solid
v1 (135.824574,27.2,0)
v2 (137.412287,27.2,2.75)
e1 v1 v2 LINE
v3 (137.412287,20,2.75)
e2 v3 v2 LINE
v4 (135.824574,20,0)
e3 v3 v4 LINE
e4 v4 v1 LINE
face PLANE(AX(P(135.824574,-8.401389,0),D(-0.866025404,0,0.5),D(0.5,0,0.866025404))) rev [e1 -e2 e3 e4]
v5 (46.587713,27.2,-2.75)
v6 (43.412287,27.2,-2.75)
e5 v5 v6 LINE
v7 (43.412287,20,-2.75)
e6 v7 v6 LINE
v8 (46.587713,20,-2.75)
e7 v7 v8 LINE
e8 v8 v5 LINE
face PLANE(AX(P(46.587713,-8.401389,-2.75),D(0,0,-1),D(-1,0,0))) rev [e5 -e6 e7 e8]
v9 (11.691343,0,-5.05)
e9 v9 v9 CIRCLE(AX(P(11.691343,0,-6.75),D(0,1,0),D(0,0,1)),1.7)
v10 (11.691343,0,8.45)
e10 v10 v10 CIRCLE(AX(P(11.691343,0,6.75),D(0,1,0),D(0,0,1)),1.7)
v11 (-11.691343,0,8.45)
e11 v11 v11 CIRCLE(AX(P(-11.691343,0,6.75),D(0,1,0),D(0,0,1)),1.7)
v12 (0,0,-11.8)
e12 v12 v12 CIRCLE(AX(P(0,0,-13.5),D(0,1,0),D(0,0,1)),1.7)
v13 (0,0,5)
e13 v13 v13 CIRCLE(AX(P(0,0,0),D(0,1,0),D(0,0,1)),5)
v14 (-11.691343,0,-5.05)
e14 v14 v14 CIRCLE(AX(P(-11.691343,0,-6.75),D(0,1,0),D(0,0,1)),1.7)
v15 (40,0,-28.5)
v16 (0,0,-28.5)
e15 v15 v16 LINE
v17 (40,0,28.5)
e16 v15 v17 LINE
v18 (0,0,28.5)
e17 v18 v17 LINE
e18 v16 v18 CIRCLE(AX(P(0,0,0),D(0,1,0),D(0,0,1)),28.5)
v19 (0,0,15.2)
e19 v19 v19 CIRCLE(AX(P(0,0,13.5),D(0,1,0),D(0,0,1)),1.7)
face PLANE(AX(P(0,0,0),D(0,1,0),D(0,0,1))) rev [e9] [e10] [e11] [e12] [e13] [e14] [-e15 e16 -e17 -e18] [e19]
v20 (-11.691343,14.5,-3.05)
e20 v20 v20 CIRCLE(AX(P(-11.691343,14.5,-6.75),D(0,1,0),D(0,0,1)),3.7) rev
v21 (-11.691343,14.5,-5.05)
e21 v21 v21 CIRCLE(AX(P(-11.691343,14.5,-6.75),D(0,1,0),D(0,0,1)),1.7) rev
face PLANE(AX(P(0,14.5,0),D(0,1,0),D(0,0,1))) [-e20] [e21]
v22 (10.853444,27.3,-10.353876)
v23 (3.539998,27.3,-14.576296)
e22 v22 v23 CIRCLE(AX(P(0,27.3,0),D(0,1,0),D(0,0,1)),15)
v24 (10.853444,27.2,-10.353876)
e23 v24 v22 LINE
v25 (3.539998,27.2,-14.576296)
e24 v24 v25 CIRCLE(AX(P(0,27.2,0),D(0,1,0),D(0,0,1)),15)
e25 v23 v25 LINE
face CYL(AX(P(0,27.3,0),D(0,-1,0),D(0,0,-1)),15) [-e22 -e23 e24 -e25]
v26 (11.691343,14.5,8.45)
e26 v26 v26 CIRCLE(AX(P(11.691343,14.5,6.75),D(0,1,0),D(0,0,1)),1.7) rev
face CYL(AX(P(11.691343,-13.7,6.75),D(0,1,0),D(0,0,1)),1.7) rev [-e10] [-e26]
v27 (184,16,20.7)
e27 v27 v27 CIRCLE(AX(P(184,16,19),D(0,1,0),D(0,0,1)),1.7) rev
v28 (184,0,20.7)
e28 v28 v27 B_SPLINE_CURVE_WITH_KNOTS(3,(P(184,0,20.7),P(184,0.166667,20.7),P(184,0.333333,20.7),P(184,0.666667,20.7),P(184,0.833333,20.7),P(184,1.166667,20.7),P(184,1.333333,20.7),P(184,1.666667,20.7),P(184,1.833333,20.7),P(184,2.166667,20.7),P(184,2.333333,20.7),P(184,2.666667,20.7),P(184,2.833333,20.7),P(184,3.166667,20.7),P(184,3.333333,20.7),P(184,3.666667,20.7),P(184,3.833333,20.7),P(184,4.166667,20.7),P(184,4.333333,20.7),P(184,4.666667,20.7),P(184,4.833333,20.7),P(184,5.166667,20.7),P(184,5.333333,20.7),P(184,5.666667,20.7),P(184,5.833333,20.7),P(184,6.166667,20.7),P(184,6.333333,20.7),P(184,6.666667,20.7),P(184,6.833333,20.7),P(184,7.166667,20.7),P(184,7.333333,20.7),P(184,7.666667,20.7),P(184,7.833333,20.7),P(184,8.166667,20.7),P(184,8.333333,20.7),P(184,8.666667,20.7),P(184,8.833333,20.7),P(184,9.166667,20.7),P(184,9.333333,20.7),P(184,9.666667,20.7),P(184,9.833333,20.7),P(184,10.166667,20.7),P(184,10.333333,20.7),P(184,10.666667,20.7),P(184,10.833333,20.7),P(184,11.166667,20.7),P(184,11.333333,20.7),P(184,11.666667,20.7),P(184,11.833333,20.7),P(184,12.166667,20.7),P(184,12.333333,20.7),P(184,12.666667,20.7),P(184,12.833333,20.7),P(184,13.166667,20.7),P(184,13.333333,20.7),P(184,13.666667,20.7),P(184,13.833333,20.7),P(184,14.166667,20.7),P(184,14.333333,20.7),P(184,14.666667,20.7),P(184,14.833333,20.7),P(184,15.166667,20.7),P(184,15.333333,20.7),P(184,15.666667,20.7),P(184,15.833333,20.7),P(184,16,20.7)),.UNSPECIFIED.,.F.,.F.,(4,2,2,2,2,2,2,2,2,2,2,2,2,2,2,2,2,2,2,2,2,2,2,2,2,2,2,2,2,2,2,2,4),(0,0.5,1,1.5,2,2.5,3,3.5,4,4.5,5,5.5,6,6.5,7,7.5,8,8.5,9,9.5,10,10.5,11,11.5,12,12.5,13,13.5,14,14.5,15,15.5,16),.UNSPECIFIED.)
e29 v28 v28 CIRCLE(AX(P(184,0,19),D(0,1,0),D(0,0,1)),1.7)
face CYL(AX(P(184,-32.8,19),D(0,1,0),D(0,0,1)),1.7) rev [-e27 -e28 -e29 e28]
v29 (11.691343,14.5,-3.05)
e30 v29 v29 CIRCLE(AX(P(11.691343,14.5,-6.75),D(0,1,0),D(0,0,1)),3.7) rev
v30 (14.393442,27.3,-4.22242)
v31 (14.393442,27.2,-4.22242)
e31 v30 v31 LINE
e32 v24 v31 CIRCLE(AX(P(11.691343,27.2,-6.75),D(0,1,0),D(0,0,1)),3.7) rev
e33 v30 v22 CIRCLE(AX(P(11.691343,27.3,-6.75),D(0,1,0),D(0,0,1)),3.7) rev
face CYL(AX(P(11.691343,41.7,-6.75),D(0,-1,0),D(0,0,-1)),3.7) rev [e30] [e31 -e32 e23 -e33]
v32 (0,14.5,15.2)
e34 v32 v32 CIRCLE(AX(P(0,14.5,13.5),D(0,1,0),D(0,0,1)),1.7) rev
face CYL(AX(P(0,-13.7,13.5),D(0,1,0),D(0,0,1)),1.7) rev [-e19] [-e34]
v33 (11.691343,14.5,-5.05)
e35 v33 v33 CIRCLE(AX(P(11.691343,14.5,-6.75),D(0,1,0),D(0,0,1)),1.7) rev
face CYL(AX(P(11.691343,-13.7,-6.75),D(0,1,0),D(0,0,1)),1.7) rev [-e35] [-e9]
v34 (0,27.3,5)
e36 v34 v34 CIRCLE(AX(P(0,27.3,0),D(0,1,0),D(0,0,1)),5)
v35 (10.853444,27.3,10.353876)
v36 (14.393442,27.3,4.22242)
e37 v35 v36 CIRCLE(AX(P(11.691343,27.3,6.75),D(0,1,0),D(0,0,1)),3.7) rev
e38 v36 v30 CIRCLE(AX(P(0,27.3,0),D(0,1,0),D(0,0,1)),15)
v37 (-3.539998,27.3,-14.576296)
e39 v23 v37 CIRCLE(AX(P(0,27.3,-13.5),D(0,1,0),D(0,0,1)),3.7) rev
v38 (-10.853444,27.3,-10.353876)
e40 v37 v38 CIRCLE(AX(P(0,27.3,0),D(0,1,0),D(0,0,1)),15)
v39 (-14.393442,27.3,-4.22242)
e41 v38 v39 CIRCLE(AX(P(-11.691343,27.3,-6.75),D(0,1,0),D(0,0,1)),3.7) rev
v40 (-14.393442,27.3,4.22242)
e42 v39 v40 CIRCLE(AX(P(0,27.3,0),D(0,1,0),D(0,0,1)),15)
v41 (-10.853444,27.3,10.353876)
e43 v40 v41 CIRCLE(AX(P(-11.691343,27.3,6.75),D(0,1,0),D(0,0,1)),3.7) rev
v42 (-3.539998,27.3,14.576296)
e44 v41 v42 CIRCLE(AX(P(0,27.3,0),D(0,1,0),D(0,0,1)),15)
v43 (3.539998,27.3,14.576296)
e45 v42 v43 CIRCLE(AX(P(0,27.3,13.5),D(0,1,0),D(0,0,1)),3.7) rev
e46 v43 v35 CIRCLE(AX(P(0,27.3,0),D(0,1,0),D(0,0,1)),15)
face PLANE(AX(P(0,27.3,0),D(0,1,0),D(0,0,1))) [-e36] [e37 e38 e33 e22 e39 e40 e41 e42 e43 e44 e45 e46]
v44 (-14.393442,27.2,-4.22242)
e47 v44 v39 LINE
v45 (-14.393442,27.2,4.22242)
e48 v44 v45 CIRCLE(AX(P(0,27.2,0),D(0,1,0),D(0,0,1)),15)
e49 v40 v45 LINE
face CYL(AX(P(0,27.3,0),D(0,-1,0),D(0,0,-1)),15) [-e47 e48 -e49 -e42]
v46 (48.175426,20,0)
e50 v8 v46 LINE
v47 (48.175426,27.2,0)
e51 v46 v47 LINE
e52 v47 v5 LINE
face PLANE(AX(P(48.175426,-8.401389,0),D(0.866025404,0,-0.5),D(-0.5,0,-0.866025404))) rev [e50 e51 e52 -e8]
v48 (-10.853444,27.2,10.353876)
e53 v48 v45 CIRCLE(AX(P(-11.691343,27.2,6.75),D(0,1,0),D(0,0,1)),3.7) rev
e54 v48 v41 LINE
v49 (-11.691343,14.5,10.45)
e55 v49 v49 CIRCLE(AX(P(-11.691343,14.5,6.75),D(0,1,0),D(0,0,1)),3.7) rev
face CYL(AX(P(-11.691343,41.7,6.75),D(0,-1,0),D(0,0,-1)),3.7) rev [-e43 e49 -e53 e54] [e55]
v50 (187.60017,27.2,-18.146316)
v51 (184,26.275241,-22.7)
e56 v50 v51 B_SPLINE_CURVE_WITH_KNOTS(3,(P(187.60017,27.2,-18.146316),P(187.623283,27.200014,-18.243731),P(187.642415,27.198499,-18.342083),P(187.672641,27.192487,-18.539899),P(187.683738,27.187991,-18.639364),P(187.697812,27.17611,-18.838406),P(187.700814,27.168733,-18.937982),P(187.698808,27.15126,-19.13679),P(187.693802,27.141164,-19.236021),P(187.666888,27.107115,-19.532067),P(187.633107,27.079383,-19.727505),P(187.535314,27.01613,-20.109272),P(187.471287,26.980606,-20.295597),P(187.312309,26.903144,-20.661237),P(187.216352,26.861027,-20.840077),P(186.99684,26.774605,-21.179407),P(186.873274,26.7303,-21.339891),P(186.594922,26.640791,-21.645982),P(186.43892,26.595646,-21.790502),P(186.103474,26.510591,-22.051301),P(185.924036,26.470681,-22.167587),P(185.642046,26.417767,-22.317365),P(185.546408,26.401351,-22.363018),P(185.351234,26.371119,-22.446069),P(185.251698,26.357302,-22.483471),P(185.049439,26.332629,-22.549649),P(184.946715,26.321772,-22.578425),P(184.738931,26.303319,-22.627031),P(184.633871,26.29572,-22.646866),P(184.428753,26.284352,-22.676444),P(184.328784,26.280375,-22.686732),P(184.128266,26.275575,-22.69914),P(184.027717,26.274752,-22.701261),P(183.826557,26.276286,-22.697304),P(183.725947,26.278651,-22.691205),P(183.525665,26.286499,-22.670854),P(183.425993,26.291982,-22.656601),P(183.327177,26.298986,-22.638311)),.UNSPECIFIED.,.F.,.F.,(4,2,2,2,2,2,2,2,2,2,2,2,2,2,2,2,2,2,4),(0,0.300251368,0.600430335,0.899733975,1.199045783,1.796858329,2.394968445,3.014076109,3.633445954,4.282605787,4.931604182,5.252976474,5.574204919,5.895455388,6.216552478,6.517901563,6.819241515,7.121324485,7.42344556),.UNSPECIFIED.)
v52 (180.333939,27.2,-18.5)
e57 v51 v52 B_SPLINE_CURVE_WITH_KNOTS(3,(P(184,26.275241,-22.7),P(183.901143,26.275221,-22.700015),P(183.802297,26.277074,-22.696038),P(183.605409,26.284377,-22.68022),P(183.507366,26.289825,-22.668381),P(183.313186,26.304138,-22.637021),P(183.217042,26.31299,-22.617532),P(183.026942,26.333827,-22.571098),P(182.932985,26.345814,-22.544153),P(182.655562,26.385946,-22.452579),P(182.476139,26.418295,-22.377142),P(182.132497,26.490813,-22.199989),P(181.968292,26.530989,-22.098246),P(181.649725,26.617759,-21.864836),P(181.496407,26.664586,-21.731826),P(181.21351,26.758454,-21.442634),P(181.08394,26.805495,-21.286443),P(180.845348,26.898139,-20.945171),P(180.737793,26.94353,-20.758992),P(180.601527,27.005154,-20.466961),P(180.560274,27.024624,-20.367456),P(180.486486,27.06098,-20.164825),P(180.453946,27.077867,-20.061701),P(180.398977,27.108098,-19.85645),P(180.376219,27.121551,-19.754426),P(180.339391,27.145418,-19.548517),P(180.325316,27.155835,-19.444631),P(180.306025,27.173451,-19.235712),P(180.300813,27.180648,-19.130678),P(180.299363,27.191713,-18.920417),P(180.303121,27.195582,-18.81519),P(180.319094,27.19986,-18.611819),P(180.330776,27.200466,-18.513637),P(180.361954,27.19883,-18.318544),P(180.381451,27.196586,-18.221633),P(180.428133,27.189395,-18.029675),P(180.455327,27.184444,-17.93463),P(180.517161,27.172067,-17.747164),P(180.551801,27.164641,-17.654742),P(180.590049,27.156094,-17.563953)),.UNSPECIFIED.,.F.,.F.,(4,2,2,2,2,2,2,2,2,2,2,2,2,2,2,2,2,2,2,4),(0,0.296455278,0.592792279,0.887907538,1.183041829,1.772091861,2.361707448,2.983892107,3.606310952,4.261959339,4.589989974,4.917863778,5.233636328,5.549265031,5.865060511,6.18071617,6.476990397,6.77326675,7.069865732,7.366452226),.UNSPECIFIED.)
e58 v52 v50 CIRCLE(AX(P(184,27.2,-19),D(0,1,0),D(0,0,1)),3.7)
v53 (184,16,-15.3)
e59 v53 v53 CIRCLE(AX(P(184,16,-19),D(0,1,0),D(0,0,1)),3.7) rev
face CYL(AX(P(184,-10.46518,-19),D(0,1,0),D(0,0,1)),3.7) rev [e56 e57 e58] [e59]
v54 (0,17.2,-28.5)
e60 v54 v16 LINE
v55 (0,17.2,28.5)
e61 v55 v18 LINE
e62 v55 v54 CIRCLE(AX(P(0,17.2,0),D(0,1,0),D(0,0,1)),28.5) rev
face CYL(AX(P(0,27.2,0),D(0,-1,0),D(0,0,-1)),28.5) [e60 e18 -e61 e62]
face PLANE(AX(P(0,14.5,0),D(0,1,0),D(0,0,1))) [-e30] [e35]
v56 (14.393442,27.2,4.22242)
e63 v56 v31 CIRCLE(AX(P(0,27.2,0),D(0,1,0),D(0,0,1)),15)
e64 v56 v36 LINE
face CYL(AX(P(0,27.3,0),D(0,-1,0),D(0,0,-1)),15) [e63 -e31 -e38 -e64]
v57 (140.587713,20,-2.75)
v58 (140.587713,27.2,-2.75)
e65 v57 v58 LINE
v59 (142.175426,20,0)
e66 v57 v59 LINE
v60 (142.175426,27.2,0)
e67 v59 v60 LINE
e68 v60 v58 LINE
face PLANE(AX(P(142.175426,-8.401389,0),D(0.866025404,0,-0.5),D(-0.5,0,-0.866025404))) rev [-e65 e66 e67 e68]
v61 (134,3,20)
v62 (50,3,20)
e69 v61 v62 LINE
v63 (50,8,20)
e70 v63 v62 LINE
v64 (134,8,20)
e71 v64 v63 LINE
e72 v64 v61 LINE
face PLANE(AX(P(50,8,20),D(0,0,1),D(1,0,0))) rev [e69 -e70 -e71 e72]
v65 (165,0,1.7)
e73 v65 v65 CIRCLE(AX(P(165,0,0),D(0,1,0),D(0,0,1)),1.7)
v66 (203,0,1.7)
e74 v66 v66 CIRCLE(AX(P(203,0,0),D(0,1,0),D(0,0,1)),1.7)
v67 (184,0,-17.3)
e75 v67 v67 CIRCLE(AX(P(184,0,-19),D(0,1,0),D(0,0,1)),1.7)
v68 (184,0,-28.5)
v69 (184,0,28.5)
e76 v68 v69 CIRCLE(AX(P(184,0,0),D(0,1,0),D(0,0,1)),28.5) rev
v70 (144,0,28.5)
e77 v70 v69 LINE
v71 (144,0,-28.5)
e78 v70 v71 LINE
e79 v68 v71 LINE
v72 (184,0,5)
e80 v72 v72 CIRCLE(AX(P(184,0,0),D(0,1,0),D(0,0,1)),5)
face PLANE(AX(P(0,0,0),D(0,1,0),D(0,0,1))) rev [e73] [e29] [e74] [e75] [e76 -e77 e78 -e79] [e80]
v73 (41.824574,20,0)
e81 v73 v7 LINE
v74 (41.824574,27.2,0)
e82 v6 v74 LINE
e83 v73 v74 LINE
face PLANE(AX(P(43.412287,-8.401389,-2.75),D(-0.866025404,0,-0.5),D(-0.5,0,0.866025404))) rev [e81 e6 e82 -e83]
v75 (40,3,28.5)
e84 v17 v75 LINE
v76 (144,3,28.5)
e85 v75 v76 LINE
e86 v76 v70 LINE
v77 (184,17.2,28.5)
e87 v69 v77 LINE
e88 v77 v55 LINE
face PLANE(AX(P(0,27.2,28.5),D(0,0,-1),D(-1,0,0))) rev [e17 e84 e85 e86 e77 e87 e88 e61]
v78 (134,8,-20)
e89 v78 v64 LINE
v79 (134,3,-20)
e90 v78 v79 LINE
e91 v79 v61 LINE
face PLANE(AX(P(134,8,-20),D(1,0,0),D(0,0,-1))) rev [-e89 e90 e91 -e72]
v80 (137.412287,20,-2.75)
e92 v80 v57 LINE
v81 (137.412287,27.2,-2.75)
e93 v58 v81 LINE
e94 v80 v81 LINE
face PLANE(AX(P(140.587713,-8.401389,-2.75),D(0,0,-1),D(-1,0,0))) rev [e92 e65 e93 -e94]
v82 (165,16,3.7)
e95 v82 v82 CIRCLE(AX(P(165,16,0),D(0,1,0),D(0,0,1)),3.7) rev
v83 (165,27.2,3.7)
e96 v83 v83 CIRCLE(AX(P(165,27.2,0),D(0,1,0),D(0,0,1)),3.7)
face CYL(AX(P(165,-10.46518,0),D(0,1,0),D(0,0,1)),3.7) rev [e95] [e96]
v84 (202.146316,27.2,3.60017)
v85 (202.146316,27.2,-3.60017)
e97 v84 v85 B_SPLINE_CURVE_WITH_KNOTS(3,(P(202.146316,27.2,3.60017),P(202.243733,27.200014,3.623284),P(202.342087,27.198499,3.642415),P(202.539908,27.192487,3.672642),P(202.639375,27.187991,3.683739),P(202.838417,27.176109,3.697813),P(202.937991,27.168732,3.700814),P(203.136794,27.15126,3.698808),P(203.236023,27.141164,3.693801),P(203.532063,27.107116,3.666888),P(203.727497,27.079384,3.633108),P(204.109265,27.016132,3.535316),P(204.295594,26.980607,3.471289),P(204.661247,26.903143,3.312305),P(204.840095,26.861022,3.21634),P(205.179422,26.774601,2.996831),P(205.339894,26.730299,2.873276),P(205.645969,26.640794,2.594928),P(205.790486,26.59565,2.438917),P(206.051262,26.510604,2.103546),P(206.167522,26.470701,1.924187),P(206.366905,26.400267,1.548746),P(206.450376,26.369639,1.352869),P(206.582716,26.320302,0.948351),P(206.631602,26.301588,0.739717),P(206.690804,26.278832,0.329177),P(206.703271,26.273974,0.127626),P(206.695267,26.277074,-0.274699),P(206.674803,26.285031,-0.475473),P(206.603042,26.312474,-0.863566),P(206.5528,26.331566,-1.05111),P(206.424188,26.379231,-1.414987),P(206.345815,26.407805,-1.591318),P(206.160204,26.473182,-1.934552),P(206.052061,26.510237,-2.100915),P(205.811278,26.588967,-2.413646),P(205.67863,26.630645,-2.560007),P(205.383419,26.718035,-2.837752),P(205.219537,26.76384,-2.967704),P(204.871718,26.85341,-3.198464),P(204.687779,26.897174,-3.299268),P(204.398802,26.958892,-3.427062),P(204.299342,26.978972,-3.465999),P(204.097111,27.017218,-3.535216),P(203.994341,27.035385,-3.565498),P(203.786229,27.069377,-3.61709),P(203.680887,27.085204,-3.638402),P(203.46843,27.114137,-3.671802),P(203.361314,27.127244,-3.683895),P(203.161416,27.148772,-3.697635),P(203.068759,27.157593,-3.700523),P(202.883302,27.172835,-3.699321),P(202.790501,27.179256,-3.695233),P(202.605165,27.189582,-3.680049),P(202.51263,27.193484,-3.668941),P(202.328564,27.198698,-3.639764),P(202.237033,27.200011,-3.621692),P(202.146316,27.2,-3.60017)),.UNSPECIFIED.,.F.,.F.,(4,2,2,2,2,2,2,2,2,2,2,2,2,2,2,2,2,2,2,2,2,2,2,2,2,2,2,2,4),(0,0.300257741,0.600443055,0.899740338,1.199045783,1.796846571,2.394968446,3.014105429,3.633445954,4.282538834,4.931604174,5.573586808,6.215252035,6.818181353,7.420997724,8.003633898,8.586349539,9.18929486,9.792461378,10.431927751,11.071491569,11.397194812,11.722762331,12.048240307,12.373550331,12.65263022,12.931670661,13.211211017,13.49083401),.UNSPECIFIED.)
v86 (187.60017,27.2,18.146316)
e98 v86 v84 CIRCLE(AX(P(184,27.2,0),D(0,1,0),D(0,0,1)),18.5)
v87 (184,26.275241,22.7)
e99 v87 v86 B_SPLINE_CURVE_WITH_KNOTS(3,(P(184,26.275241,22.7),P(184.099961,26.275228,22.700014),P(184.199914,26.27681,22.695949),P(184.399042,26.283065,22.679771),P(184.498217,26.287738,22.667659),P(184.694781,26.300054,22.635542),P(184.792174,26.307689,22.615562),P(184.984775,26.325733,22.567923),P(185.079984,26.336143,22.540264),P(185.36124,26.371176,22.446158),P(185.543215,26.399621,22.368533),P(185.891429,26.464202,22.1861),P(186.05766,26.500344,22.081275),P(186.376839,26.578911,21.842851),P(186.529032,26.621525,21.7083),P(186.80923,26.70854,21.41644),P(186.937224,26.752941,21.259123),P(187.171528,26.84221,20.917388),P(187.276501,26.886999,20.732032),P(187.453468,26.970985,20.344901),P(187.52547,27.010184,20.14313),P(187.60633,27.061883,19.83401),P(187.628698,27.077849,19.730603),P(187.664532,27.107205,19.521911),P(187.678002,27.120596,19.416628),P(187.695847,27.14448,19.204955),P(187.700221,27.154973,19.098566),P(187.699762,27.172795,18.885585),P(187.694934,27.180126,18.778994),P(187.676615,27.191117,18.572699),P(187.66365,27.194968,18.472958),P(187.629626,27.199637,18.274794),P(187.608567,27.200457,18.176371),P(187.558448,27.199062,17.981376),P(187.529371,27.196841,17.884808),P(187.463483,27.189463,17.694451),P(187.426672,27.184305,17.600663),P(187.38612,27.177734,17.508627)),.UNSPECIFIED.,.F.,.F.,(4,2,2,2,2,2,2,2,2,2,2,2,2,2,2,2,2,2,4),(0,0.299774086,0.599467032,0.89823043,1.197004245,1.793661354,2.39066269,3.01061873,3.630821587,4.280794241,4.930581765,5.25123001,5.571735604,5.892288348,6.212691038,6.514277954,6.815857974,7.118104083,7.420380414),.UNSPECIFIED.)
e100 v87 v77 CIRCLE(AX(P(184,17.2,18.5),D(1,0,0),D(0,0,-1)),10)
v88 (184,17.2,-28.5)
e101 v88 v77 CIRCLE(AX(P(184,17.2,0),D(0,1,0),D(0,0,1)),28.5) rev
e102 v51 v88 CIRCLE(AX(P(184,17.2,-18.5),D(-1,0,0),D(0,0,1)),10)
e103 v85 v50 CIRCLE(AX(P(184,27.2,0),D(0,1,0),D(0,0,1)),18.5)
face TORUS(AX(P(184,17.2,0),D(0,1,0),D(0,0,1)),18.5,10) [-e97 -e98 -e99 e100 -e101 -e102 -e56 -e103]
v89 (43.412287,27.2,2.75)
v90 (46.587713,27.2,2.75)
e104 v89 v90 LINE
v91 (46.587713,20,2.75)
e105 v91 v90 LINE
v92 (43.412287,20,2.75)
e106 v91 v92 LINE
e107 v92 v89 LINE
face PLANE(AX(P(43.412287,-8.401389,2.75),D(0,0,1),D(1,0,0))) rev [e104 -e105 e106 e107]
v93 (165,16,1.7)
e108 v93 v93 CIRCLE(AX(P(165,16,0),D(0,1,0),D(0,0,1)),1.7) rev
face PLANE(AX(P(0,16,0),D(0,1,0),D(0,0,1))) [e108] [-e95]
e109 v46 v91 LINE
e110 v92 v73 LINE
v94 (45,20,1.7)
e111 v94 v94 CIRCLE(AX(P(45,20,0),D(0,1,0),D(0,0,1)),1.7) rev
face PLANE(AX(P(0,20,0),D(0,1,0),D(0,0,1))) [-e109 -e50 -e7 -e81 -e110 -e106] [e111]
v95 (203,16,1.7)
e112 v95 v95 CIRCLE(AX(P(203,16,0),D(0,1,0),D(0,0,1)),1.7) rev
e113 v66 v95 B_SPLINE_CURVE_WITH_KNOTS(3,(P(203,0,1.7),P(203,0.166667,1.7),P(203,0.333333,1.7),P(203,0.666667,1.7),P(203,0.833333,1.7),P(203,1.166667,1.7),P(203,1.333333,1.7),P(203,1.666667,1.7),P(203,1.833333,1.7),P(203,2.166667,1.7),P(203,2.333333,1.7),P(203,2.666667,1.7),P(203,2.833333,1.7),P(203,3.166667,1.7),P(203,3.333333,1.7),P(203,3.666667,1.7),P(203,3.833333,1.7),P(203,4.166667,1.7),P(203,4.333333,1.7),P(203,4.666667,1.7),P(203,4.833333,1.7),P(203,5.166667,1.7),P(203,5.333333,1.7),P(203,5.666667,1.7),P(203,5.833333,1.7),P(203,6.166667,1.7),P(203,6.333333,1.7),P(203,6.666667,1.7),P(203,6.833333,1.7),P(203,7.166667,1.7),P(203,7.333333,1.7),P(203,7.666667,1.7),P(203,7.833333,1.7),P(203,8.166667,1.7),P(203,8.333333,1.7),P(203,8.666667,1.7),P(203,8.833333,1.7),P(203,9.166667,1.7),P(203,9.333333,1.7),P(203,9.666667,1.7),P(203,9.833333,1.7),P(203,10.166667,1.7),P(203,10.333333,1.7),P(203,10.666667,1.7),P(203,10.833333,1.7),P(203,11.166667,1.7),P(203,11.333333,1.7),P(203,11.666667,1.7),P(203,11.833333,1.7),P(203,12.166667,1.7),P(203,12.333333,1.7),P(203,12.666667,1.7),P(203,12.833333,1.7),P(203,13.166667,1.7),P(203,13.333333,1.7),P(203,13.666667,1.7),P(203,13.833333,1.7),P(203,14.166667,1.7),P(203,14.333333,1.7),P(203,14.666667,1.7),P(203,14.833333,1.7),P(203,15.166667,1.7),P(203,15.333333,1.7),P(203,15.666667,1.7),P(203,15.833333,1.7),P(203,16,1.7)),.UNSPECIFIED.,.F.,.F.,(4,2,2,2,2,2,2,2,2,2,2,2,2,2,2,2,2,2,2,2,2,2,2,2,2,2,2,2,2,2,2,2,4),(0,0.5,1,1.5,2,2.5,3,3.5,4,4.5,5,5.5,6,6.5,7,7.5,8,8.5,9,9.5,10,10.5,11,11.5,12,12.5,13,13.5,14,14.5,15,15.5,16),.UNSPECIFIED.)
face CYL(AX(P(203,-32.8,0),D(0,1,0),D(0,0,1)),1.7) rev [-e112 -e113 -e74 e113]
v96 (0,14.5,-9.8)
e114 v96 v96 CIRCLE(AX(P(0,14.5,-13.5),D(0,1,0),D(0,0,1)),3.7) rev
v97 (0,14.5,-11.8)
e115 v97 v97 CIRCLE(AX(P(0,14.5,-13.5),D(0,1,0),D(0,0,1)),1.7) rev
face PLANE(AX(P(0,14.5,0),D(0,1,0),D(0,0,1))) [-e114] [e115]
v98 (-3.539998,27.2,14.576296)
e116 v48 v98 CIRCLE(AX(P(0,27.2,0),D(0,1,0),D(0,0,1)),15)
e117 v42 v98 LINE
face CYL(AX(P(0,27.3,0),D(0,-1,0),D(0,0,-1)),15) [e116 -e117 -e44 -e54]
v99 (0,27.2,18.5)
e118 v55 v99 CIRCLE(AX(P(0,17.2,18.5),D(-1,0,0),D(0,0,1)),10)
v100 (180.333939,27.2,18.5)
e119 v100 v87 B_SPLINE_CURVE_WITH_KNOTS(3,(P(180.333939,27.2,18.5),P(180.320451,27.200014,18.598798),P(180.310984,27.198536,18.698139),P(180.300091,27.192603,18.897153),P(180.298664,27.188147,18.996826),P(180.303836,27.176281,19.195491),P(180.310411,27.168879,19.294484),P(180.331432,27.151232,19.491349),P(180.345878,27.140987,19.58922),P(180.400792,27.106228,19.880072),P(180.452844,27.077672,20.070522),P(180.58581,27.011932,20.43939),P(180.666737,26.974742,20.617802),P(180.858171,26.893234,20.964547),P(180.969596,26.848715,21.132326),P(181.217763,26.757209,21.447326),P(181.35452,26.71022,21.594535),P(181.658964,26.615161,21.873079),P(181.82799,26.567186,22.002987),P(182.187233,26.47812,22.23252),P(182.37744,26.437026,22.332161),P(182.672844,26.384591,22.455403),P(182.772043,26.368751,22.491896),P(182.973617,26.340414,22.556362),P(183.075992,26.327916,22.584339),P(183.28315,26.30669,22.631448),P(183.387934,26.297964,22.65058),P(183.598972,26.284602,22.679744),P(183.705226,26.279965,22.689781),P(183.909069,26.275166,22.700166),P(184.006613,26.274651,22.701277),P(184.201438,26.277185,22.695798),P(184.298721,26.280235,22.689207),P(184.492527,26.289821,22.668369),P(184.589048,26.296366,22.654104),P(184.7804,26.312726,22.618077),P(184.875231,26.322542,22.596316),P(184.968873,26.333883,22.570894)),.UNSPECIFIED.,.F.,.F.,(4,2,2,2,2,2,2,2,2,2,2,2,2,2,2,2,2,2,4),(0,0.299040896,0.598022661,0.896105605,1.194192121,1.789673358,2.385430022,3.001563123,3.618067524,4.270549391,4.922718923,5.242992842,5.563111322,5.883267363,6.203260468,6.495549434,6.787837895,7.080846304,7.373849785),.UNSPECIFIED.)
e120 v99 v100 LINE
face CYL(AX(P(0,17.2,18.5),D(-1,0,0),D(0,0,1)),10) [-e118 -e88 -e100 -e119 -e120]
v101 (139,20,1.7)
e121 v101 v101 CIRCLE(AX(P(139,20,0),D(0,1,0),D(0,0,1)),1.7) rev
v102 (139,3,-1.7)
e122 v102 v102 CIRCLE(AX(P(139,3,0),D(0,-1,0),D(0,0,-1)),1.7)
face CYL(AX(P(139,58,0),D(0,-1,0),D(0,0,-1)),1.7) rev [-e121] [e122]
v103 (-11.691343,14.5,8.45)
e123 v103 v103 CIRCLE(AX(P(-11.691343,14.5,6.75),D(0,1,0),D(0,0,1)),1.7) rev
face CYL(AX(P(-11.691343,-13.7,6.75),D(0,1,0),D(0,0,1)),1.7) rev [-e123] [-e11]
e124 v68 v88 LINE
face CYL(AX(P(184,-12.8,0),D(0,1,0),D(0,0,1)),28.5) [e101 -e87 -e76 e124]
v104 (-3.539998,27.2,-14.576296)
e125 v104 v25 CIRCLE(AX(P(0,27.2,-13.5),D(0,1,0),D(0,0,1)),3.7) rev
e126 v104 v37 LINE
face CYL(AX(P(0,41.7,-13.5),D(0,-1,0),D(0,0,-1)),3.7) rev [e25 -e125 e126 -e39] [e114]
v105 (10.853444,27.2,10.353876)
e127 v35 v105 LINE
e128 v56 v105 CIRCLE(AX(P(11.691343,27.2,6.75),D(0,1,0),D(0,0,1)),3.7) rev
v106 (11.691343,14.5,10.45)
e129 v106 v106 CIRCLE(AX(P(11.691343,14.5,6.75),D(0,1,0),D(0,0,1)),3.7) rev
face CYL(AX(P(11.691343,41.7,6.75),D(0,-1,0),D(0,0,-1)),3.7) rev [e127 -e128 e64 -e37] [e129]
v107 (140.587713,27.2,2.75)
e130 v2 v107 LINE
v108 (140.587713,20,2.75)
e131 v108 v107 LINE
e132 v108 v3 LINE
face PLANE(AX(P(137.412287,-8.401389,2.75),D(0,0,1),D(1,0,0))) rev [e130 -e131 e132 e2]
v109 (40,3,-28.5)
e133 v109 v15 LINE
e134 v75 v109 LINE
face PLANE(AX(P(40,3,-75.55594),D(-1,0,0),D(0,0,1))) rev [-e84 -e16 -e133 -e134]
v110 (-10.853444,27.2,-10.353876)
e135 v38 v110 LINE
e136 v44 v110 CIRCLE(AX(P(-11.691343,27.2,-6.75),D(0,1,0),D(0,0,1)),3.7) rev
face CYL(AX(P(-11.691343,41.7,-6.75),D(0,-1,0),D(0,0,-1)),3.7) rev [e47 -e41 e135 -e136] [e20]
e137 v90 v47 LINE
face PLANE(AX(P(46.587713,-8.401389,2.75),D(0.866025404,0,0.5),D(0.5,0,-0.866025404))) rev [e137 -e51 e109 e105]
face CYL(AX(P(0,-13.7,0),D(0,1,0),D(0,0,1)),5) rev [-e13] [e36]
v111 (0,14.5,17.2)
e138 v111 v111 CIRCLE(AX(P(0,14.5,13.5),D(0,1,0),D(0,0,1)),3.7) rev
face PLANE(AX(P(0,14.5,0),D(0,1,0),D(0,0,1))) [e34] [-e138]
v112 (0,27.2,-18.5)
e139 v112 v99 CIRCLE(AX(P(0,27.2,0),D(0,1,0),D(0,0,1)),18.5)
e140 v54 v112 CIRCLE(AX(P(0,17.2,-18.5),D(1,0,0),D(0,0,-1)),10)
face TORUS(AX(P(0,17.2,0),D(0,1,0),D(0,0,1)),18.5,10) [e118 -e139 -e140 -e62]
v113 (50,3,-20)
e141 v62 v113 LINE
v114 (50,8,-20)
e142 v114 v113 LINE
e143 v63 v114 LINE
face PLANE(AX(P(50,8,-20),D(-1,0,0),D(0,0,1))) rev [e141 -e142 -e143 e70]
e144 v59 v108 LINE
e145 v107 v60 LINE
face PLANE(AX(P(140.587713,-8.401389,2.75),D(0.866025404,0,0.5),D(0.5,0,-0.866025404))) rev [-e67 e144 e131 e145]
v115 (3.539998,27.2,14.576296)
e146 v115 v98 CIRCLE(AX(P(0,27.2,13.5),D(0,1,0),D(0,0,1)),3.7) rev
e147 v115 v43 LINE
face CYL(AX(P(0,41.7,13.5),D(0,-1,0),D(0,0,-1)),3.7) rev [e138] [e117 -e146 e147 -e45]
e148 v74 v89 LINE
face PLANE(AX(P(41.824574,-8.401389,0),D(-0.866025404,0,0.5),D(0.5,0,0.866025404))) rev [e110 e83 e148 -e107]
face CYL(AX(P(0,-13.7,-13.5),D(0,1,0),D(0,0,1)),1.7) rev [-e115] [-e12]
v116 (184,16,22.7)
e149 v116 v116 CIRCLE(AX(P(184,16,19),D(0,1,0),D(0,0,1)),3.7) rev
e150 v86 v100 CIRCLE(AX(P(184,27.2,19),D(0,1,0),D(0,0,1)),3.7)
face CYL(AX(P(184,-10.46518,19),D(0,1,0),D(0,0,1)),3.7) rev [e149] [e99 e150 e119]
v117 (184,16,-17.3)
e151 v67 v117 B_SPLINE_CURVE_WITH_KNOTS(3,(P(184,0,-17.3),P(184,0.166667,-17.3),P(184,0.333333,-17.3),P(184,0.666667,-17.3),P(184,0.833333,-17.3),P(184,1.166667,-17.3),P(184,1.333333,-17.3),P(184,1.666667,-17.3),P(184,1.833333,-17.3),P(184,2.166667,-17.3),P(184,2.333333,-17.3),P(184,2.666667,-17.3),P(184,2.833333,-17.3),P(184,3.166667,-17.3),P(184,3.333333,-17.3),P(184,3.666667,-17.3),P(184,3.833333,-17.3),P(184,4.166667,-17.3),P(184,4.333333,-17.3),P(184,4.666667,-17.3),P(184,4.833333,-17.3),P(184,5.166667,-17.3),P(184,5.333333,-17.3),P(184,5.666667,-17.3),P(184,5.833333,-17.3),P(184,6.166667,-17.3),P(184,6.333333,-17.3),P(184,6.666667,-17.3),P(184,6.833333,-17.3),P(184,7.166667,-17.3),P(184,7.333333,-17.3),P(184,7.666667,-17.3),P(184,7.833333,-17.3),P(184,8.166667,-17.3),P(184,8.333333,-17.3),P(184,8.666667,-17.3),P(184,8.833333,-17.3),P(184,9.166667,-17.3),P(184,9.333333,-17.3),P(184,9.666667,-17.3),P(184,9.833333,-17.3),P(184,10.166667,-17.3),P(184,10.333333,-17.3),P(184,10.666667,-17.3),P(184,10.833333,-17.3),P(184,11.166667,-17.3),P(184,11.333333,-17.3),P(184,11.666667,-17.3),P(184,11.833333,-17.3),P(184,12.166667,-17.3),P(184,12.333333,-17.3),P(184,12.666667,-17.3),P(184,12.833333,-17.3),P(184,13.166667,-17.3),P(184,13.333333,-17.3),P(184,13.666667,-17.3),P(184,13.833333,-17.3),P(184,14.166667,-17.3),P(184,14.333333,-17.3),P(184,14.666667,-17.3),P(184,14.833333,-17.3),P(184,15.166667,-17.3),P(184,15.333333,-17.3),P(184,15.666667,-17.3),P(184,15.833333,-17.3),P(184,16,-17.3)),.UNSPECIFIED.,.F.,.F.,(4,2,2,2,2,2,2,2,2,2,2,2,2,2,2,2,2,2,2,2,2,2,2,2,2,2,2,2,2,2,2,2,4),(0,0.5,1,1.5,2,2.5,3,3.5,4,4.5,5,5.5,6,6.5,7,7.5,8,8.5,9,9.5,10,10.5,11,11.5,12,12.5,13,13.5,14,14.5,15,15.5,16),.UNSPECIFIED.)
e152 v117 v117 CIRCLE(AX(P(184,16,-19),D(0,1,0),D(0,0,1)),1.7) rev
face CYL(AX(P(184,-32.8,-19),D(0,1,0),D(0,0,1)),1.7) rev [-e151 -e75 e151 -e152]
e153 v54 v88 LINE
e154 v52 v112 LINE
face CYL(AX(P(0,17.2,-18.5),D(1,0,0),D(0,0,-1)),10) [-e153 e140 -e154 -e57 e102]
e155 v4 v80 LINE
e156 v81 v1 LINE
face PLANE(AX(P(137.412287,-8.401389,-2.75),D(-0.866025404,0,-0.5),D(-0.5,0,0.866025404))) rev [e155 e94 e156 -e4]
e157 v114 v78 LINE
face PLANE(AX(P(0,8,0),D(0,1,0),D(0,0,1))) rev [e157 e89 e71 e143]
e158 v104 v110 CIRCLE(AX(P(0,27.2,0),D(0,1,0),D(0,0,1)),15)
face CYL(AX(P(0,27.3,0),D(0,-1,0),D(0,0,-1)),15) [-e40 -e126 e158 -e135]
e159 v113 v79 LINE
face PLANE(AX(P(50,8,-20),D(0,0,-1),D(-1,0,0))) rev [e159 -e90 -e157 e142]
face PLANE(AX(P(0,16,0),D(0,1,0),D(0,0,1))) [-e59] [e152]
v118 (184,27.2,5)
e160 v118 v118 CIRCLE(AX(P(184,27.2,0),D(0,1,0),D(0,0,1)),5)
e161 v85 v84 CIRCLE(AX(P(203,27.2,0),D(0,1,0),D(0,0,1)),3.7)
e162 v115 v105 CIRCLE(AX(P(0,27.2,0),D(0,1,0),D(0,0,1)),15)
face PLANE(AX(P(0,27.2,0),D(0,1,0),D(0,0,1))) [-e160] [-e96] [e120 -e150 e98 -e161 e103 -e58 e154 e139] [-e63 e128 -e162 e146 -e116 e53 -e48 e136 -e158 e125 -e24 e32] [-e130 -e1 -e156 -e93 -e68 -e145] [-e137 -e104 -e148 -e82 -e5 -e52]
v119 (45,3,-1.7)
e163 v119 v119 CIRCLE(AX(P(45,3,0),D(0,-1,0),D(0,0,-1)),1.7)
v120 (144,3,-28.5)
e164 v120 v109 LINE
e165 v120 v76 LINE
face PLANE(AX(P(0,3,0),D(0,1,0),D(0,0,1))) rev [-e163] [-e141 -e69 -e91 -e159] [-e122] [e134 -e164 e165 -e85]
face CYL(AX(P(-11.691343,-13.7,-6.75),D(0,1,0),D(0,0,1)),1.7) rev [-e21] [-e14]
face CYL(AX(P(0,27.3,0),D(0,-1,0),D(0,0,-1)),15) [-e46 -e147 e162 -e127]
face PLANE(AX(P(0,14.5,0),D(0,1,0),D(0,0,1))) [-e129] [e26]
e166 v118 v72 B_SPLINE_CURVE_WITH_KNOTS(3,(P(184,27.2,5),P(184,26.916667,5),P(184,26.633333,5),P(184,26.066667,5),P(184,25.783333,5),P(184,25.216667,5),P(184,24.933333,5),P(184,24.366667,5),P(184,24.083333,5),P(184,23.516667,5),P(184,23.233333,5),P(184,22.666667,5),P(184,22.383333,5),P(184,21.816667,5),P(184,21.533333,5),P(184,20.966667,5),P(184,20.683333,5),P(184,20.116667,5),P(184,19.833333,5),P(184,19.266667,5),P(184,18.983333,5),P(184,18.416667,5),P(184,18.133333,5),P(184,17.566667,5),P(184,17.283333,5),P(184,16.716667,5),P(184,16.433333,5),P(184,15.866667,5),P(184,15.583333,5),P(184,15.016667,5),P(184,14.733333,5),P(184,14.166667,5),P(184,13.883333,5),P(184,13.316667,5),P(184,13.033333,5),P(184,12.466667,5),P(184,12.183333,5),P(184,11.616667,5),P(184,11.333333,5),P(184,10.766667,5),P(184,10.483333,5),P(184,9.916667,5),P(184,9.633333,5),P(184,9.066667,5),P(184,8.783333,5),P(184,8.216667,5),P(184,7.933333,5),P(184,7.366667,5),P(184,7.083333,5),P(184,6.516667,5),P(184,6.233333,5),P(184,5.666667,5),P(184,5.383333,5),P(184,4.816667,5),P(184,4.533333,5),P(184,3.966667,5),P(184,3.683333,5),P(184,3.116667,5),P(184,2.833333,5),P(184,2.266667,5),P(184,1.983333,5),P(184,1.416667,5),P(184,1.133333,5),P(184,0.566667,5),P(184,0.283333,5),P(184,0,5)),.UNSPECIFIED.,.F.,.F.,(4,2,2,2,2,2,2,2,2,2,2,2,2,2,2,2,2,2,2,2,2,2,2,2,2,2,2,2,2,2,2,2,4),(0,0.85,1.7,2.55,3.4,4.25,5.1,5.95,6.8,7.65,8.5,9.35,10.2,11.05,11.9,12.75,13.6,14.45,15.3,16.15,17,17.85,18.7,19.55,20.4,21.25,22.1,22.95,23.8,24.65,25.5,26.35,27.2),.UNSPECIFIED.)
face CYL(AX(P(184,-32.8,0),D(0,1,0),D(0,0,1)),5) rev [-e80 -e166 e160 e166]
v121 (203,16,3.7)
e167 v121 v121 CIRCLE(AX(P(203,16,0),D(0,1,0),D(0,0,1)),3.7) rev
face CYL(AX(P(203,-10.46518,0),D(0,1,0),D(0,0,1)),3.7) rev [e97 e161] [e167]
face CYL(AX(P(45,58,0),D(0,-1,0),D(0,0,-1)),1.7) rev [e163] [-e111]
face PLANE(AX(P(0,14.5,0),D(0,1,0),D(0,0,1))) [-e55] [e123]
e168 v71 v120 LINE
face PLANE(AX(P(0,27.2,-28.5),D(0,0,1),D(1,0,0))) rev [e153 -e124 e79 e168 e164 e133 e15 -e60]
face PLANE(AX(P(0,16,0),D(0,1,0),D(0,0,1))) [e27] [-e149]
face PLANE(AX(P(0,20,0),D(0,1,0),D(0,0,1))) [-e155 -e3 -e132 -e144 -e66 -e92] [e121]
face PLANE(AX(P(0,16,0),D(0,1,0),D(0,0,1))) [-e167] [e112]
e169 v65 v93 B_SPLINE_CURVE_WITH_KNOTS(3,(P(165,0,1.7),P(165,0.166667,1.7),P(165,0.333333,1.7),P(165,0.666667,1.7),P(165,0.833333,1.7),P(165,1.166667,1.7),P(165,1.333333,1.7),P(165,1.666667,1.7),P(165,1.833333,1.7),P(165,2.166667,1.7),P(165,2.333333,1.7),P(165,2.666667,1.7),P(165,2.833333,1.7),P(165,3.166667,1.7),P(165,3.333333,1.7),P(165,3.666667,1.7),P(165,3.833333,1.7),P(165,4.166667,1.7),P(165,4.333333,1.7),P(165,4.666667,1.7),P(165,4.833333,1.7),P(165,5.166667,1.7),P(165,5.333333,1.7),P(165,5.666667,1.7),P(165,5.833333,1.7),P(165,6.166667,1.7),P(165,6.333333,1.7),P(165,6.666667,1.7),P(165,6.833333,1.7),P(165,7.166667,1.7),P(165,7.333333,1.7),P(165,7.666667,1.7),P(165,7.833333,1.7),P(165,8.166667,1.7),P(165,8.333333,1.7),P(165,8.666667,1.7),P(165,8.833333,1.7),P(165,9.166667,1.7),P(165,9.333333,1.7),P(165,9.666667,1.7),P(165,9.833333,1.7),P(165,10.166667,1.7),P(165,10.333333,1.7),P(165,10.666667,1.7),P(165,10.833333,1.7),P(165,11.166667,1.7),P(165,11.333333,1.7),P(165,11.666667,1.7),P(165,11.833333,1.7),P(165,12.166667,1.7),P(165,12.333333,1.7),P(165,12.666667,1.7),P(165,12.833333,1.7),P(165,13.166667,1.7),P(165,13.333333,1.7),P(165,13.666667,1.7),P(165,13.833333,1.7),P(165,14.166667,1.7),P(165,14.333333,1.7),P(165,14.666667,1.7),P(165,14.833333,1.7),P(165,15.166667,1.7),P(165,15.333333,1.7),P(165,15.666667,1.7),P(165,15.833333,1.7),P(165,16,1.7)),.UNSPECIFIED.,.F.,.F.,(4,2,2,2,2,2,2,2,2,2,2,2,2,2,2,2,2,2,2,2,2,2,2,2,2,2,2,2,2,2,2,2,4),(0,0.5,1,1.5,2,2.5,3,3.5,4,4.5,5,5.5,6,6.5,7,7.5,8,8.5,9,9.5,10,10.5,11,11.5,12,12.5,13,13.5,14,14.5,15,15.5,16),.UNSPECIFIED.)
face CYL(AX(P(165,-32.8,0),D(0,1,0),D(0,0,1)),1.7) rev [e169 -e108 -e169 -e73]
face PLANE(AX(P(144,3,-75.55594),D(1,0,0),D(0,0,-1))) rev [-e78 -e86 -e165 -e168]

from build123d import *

# Parameters (mm, degrees)
EXTRUDE_1_DEPTH          = 27.2
SKETCH_2_R               = 15
EXTRUDE_2_DEPTH          = 0.1
SKETCH_3_R               = 1.7
CUT_EXTRUDE_2_DEPTH      = 41
SKETCH_4_R               = 5
CUT_EXTRUDE_3_DEPTH      = 41
SKETCH_6_R               = 5
SKETCH_6_R_2             = 1.7
CUT_EXTRUDE_4_DEPTH      = 60
SKETCH_8_R               = 3.7
CUT_EXTRUDE_5_DEPTH      = 11.2
CUT_EXTRUDE_6_DEPTH      = 40
CUT_EXTRUDE_7_DEPTH      = 14.5
CUT_EXTRUDE_7_DEPTH_BACK = 12.7
SKETCH_24_R              = 3.7
FILLET_1_R               = 10
SKETCH_25_W              = 104
SKETCH_25_H              = 148.506502633
CUT_EXTRUDE_8_DEPTH      = 3
SKETCH_26_W              = 84
SKETCH_26_H              = 40
CUT_EXTRUDE_9_DEPTH      = 5
SKETCH_27_R              = 1.7
CUT_EXTRUDE_10_DEPTH     = 55
CUT_EXTRUDE_11_DEPTH     = 7.2


with BuildPart() as part:
    # 草图1 → 凸台-拉伸1 (new body)
    with BuildSketch(Plane(origin=(0, 0, 0), x_dir=(1, 0, 0), z_dir=(0, 1, 0))):
        with BuildLine():
            Line((0, 28.5), (220, 28.5))
            Line((220, 28.5), (220, -28.5))
            Line((220, -28.5), (0, -28.5))
            ThreePointArc((0, -28.5), (-28.5, 0), (0, 28.5))
        make_face()
    extrude(amount=EXTRUDE_1_DEPTH)

    # 草图2 → 凸台-拉伸2 (add)
    with BuildSketch(Plane(origin=(0, 27.2, 0), x_dir=(1, 0, 0), z_dir=(0, 1, 0))):
        with Locations(Location((0, 0, 0), (0, 0, 270))):
            Circle(SKETCH_2_R)
    extrude(amount=EXTRUDE_2_DEPTH)

    # 草图3 → 切除-拉伸2 (cut)
    with BuildSketch(Plane(origin=(0, 27.3, 0), x_dir=(1, 0, 0), z_dir=(0, 1, 0))):
        with Locations(Location((0, 13.5, 0), (0, 0, 270))):
            Circle(SKETCH_3_R)
        with Locations(Location((11.691342951, 6.75, 0), (0, 0, 270))):
            Circle(SKETCH_3_R)
        with Locations(Location((11.691342951, -6.75, 0), (0, 0, 270))):
            Circle(SKETCH_3_R)
        with Locations(Location((0, -13.5, 0), (0, 0, 270))):
            Circle(SKETCH_3_R)
        with Locations(Location((-11.691342951, -6.75, 0), (0, 0, 270))):
            Circle(SKETCH_3_R)
        with Locations(Location((-11.691342951, 6.75, 0), (0, 0, 270))):
            Circle(SKETCH_3_R)
    extrude(amount=-CUT_EXTRUDE_2_DEPTH, mode=Mode.SUBTRACT)

    # 草图4 → 切除-拉伸3 (cut)
    with BuildSketch(Plane(origin=(0, 27.3, 0), x_dir=(1, 0, 0), z_dir=(0, 1, 0))):
        with Locations(Location((0, 0, 0), (0, 0, 270))):
            Circle(SKETCH_4_R)
    extrude(amount=-CUT_EXTRUDE_3_DEPTH, mode=Mode.SUBTRACT)

    # 草图6 → 切除-拉伸4 (cut)
    with BuildSketch(Plane(origin=(0, 27.2, 0), x_dir=(1, 0, 0), z_dir=(0, 1, 0))):
        with Locations(Location((184, 0, 0), (0, 0, 270))):
            Circle(SKETCH_6_R)
        with Locations(Location((184, 19, 0), (0, 0, 270))):
            Circle(SKETCH_6_R_2)
        with Locations(Location((165, 0, 0), (0, 0, 270))):
            Circle(SKETCH_6_R_2)
        with Locations(Location((184, -19, 0), (0, 0, 270))):
            Circle(SKETCH_6_R_2)
        with Locations(Location((203, 0, 0), (0, 0, 270))):
            Circle(SKETCH_6_R_2)
    extrude(amount=-CUT_EXTRUDE_4_DEPTH, mode=Mode.SUBTRACT)

    # 草图8 → 切除-拉伸5 (cut)
    with BuildSketch(Plane(origin=(0, 27.2, 0), x_dir=(1, 0, 0), z_dir=(0, 1, 0))):
        with Locations(Location((184, 19, 0), (0, 0, 270))):
            Circle(SKETCH_8_R)
        with Locations(Location((203, 0, 0), (0, 0, 270))):
            Circle(SKETCH_8_R)
        with Locations(Location((184, -19, 0), (0, 0, 270))):
            Circle(SKETCH_8_R)
        with Locations(Location((165, 0, 0), (0, 0, 270))):
            Circle(SKETCH_8_R)
    extrude(amount=-CUT_EXTRUDE_5_DEPTH, mode=Mode.SUBTRACT)

    # 草图20 → 切除-拉伸6 (cut)
    with BuildSketch(Plane(origin=(0, 27.2, 0), x_dir=(1, 0, 0), z_dir=(0, 1, 0))):
        with BuildLine():
            Line((184, 28.5), (231.029995119, 28.5))
            Line((231.029995119, 28.5), (231.029995119, -33.501225727))
            Line((231.029995119, -33.501225727), (184, -33.501225727))
            Line((184, -33.501225727), (184, -28.5))
            ThreePointArc((184, -28.5), (212.5, 0), (184, 28.5))
        make_face()
    extrude(amount=-CUT_EXTRUDE_6_DEPTH, mode=Mode.SUBTRACT)

    # 草图24 → 切除-拉伸7 (cut, two sides: drawn at the far end of the back side and taken through both)
    with BuildSketch(Plane(origin=(0, 27.2, 0), x_dir=(1, 0, 0), z_dir=(0, 1, 0)).offset(-CUT_EXTRUDE_7_DEPTH_BACK)):
        with Locations(Location((0, -13.5, 0), (0, 0, 343.088700116))):
            Circle(SKETCH_24_R)
        with Locations(Location((-11.691342951, -6.75, 0), (0, 0, 136.911299884))):
            Circle(SKETCH_24_R)
        with Locations(Location((-11.691342951, 6.75, 0), (0, 0, 76.911299884))):
            Circle(SKETCH_24_R)
        with Locations(Location((0, 13.5, 0), (0, 0, 16.911299884))):
            Circle(SKETCH_24_R)
        with Locations(Location((11.691342951, 6.75, 0), (0, 0, 103.088700116))):
            Circle(SKETCH_24_R)
        with Locations(Location((11.691342951, -6.75, 0), (0, 0, 43.088700116))):
            Circle(SKETCH_24_R)
    extrude(amount=CUT_EXTRUDE_7_DEPTH + CUT_EXTRUDE_7_DEPTH_BACK, mode=Mode.SUBTRACT)

    # 圆角1
    # the kernel refuses this fillet: 10 mm, written as the material it takes off along each edge
    with BuildSketch(Plane(origin=(0, 27.2, -28.5), x_dir=(0, -1, 0), z_dir=(1, 0, 0))) as fillet_1_piece_1:
        with BuildLine():
            CenterArc((FILLET_1_R, -FILLET_1_R), FILLET_1_R, 90, 90)
            Line((0, -FILLET_1_R), (0, 0))
            Line((0, 0), (FILLET_1_R, 0))
        make_face()
    extrude(amount=184, mode=Mode.SUBTRACT)
    with BuildSketch(Plane(origin=(184, 27.2, 0), x_dir=(0, 0, 1), z_dir=(-1, 0, 0))) as fillet_1_piece_2:
        with BuildLine():
            CenterArc((28.5 - FILLET_1_R, -FILLET_1_R), FILLET_1_R, 0, 90)
            Line((28.5 - FILLET_1_R, 0), (28.5, 0))
            Line((28.5, 0), (28.5, -FILLET_1_R))
        make_face()
    revolve(axis=Axis((184, 27.2, 0), (0, 1, 0)), revolution_arc=180, mode=Mode.SUBTRACT)
    with BuildSketch(Plane(origin=(0, 27.2, 0), x_dir=(0, 0, 1), z_dir=(1, 0, 0))) as fillet_1_piece_3:
        with BuildLine():
            CenterArc((28.5 - FILLET_1_R, FILLET_1_R), FILLET_1_R, 270, 90)
            Line((28.5, FILLET_1_R), (28.5, 0))
            Line((28.5, 0), (28.5 - FILLET_1_R, 0))
        make_face()
    revolve(axis=Axis((0, 27.2, 0), (0, -1, 0)), revolution_arc=180, mode=Mode.SUBTRACT)
    with BuildSketch(Plane(origin=(184, 27.2, 28.5), x_dir=(0, 0, -1), z_dir=(-1, 0, 0))) as fillet_1_piece_4:
        with BuildLine():
            CenterArc((FILLET_1_R, FILLET_1_R), FILLET_1_R, 180, 90)
            Line((0, FILLET_1_R), (0, 0))
            Line((0, 0), (FILLET_1_R, 0))
        make_face()
    extrude(amount=184, mode=Mode.SUBTRACT)

    # 草图25 → 切除-拉伸8 (cut)
    with BuildSketch(Plane.XZ):
        with Locations((92, -1.302688619)):
            Rectangle(SKETCH_25_W, SKETCH_25_H)
    extrude(amount=-CUT_EXTRUDE_8_DEPTH, mode=Mode.SUBTRACT)

    # 草图26 → 切除-拉伸9 (cut)
    with BuildSketch(Plane.XZ.offset(-3)):
        with Locations((92, 0)):
            Rectangle(SKETCH_26_W, SKETCH_26_H)
    extrude(amount=-CUT_EXTRUDE_9_DEPTH, mode=Mode.SUBTRACT)

    # 草图27 → 切除-拉伸10 (cut)
    with BuildSketch(Plane.XZ.offset(-3)):
        with Locations(Location((45, 0, 0), (0, 0, 270))):
            Circle(SKETCH_27_R)
        with Locations(Location((139, 0, 0), (0, 0, 270))):
            Circle(SKETCH_27_R)
    extrude(amount=-CUT_EXTRUDE_10_DEPTH, mode=Mode.SUBTRACT)

    # 草图28 → 切除-拉伸11 (cut)
    with BuildSketch(Plane(origin=(0, 27.2, 0), x_dir=(1, 0, 0), z_dir=(0, 1, 0))):
        Polygon((41.824573519, 0), (43.41228676, -2.75), (46.58771324, -2.75), (48.175426481, 0), (46.58771324, 2.75), (43.41228676, 2.75), align=None)
        Polygon((135.824573519, 0), (137.41228676, -2.75), (140.58771324, -2.75), (142.175426481, 0), (140.58771324, 2.75), (137.41228676, 2.75), align=None)
    extrude(amount=-CUT_EXTRUDE_11_DEPTH, mode=Mode.SUBTRACT)


solid = part.part
